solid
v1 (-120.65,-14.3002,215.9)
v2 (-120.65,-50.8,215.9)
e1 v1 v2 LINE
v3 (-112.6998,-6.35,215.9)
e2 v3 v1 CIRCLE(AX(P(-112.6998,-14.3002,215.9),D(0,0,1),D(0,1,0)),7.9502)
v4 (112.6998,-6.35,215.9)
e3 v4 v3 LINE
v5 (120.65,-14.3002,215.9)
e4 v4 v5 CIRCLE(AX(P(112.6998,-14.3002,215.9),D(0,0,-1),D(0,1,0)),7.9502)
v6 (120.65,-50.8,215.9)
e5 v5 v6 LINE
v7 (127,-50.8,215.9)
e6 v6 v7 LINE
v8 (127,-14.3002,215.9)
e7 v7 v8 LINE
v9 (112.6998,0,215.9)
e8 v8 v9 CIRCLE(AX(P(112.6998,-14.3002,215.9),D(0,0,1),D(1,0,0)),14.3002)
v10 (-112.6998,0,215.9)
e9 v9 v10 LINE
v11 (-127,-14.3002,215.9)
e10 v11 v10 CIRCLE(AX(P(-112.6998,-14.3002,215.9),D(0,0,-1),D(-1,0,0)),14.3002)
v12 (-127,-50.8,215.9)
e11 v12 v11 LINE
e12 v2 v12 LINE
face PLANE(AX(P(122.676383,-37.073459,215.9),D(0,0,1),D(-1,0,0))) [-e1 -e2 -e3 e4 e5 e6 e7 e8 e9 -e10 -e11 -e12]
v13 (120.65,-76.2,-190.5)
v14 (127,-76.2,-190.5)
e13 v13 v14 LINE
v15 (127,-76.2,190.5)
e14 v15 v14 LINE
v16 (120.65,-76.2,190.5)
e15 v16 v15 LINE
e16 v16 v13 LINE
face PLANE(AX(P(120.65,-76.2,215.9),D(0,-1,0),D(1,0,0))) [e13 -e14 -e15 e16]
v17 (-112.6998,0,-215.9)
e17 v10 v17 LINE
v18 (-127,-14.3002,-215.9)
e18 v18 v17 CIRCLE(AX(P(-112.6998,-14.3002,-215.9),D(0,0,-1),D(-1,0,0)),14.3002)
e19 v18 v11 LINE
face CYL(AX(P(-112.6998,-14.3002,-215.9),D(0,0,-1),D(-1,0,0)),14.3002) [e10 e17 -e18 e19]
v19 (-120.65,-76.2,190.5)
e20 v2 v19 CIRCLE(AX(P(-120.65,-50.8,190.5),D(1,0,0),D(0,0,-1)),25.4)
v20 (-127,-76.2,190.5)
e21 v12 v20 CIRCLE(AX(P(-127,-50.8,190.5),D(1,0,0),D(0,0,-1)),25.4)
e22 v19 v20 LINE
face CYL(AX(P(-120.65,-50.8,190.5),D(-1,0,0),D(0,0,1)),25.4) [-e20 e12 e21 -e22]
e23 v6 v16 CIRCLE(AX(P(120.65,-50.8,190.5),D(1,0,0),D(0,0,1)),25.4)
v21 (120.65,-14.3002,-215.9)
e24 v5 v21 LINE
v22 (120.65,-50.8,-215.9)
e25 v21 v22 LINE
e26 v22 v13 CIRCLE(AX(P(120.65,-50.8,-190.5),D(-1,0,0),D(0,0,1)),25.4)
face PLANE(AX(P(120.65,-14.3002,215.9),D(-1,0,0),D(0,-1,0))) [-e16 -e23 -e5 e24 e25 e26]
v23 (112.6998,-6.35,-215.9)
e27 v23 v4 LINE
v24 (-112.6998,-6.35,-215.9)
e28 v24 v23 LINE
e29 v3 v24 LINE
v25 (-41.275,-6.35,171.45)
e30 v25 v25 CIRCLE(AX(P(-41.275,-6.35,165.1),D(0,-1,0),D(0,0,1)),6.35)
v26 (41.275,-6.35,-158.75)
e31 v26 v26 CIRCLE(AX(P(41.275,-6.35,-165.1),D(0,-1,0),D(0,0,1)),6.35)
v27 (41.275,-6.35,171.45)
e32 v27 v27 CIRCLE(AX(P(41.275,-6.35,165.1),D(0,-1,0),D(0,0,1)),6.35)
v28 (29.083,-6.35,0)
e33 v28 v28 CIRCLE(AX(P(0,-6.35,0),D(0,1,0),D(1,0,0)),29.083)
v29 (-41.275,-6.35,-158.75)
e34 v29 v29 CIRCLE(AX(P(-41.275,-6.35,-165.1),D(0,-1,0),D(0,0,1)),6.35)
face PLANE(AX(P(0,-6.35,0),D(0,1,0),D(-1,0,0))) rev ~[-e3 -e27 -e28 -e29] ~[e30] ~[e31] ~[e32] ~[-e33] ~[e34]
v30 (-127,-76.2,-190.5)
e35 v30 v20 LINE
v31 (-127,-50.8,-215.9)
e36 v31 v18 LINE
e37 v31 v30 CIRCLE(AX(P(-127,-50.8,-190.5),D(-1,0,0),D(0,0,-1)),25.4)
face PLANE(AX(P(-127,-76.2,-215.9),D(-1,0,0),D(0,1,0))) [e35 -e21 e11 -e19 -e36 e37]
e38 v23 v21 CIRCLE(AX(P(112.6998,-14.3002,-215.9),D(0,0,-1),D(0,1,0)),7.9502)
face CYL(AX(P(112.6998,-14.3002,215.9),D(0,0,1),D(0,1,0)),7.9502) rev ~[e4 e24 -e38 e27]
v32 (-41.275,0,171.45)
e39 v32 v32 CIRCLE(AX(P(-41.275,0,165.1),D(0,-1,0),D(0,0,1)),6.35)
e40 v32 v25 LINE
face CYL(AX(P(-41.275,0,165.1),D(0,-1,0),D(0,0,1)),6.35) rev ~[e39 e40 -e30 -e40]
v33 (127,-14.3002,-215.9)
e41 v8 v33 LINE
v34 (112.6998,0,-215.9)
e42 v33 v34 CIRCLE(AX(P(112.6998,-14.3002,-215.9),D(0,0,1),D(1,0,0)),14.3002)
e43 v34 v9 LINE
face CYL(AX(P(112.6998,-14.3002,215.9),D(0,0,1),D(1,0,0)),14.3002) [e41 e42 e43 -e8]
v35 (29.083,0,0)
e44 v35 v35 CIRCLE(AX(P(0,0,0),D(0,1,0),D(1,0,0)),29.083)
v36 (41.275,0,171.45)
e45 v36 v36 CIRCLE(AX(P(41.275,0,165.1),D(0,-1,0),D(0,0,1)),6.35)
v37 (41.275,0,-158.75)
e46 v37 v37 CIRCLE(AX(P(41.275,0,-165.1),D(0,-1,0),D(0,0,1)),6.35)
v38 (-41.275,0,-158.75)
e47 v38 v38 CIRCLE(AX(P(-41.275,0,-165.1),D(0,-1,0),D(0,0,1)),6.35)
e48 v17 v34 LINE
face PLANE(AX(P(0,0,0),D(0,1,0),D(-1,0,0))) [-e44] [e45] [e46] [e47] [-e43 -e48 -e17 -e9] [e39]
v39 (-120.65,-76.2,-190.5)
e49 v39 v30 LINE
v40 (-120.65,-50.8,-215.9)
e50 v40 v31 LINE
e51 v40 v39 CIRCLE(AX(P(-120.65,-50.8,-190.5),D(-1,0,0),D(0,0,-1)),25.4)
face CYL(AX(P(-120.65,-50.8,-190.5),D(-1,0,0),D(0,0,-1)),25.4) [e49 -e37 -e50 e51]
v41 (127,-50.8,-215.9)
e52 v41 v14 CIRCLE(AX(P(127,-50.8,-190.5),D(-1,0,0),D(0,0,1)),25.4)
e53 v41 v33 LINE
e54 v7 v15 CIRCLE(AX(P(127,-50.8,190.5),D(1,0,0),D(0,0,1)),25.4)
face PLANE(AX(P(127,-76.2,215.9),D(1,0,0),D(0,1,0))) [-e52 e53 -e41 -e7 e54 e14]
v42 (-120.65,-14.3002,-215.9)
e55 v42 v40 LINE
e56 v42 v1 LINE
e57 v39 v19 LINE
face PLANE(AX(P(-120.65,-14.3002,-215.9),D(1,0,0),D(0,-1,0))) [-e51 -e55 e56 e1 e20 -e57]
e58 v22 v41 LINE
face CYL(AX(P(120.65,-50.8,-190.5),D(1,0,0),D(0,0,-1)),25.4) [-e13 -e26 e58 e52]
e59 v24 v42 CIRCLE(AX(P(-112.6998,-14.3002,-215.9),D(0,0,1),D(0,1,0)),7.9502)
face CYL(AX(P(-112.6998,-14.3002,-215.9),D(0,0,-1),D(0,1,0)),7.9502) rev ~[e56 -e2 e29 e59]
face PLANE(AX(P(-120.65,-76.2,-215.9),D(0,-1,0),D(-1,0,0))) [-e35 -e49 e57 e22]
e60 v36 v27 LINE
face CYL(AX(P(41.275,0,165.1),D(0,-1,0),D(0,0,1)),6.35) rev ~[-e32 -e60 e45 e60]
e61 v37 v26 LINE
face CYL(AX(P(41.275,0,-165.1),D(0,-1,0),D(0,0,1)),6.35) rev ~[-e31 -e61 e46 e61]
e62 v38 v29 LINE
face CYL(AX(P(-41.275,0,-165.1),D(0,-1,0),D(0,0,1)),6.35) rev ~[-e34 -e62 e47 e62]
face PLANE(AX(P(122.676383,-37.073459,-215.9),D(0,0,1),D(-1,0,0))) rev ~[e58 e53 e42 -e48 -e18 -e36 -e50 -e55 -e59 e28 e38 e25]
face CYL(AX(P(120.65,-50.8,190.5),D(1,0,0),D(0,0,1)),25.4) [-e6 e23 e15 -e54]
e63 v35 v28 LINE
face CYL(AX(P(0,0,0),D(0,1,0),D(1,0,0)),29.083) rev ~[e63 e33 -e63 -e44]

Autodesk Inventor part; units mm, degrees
ref_plane "YZ Plane" through (0, 0, 0) normal (1, 0, 0) x (0, 1, 0)
ref_plane "XZ Plane" through (0, 0, 0) normal (0, 1, 0) x (-1, 0, 0)
ref_plane "XY Plane" through (0, 0, 0) normal (0, 0, 1) x (1, 0, 0)
sketch "Sketch4" plane through (0, 0, 0) normal (0, 1, 0) x (-1, 0, 0)
  line L0 (-127, 215.9) -> (127, 215.9)
  line L1 (127, 215.9) -> (127, -215.9)
  line L2 (127, -215.9) -> (-127, -215.9)
  line L3 (-127, -215.9) -> (-127, 215.9)
  line L4 (-127, 215.9) -> (127, -215.9) construction
  line L5 (127, 215.9) -> (-127, -215.9) construction
  point P0 (0, 0)
  dimension "d6" = 431.8
  dimension "d7" = 254
extrude "Plate1" add sketch "Sketch4" against normal blind 6.35
sketch "Sketch5" plane through (120.65, 0, -215.9) normal (1, 0, 0) x (0, -1, 0)
  line L0 (0, 431.8) -> (0, 0)
  line L1 (0, 0) -> (76.2, 0)
  line L2 (76.2, 0) -> (76.2, 431.8)
  line L3 (76.2, 431.8) -> (0, 431.8)
edge flange "Flange1" height 76.2 angle 90 thickness 6.35 bend radius 7.9502 thickness toward (1, 0, 0) relief tear relief width 6.35 relief depth 3.175 corner gap 6.35 corner form 0 edges at (127, 0, 0) (-127, 0, 0) wall of the first edge with corners at (120.65, 0, 215.9) (120.65, 0, -215.9) (120.65, -76.2, -215.9) (120.65, -76.2, 215.9)
bend "Bend1"
corner "Corner1"
sketch "Sketch6" plane through (0, 0, 0) normal (0, 1, 0) x (1, 0, 0)
  circle A0 centre (0, 0) radius 29.083
  dimension "d19" = 58.166
extrude "Cut1" cut sketch "Sketch6" against normal blind 6.35
sketch "Sketch7" plane through (0, 0, 0) normal (0, 1, 0) x (1, 0, 0)
  line L0 (-41.275, -165.1) -> (41.275, -165.1)
  line L1 (41.275, -165.1) -> (41.275, 165.1)
  line L2 (41.275, 165.1) -> (-41.275, 165.1)
  line L3 (-41.275, 165.1) -> (-41.275, -165.1)
  line L4 (-41.275, -165.1) -> (41.275, 165.1) construction
  line L5 (41.275, -165.1) -> (-41.275, 165.1) construction
  line L6 (112.6998, 215.9) -> (-112.6998, 215.9) projected
  point P0 (0, 0)
  dimension "d22" = 82.55
  dimension "d23" = 50.8
hole "Hole1" at (-41.275, 0, 165.1) at (41.275, 0, 165.1) at (-41.275, 0, -165.1) at (41.275, 0, -165.1) direction (0, -1, 0) diameter 12.7 depth 6.35
fillet "Corner Round1" radius 25.4 4 edges at (-123.825, -76.2, 215.9) (123.825, -76.2, 215.9) (123.825, -76.2, -215.9) (-123.825, -76.2, -215.9)
equation "\"d20\" = Thickness"
equation "\"d29\" = Thickness"
equation "\"d8\" = Thickness"
equation "\"d9\" = BendReliefWidth"
equation "\"d10\" = BendReliefDepth"
equation "\"d11\" = MinimumRemnant"
equation "\"d12\" = TransitionRadius"
equation "\"d15\" = BendRadius"
equation "\"d16\" = CornerReliefSize"
equation "\"d17\" = GapSize"
equation "\"d18\" = JacobiRadiusSize"
equation "\"BendReliefWidth\" = Thickness"
equation "\"BendReliefDepth\" = 0.5 * Thickness"
equation "\"CornerReliefSize\" = 4 * Thickness"
equation "\"MinimumRemnant\" = 2 * Thickness"
equation "\"TransitionRadius\" = BendRadius"
equation "\"JacobiRadiusSize\" = Thickness"
equation "\"GapSize\" = Thickness"
equation "\"Thickness\" = 6.35"
equation "\"BendRadius\" = 7.9502"
properties part number "Gooseneck Model-1 Sheet-1" material "SS304"
